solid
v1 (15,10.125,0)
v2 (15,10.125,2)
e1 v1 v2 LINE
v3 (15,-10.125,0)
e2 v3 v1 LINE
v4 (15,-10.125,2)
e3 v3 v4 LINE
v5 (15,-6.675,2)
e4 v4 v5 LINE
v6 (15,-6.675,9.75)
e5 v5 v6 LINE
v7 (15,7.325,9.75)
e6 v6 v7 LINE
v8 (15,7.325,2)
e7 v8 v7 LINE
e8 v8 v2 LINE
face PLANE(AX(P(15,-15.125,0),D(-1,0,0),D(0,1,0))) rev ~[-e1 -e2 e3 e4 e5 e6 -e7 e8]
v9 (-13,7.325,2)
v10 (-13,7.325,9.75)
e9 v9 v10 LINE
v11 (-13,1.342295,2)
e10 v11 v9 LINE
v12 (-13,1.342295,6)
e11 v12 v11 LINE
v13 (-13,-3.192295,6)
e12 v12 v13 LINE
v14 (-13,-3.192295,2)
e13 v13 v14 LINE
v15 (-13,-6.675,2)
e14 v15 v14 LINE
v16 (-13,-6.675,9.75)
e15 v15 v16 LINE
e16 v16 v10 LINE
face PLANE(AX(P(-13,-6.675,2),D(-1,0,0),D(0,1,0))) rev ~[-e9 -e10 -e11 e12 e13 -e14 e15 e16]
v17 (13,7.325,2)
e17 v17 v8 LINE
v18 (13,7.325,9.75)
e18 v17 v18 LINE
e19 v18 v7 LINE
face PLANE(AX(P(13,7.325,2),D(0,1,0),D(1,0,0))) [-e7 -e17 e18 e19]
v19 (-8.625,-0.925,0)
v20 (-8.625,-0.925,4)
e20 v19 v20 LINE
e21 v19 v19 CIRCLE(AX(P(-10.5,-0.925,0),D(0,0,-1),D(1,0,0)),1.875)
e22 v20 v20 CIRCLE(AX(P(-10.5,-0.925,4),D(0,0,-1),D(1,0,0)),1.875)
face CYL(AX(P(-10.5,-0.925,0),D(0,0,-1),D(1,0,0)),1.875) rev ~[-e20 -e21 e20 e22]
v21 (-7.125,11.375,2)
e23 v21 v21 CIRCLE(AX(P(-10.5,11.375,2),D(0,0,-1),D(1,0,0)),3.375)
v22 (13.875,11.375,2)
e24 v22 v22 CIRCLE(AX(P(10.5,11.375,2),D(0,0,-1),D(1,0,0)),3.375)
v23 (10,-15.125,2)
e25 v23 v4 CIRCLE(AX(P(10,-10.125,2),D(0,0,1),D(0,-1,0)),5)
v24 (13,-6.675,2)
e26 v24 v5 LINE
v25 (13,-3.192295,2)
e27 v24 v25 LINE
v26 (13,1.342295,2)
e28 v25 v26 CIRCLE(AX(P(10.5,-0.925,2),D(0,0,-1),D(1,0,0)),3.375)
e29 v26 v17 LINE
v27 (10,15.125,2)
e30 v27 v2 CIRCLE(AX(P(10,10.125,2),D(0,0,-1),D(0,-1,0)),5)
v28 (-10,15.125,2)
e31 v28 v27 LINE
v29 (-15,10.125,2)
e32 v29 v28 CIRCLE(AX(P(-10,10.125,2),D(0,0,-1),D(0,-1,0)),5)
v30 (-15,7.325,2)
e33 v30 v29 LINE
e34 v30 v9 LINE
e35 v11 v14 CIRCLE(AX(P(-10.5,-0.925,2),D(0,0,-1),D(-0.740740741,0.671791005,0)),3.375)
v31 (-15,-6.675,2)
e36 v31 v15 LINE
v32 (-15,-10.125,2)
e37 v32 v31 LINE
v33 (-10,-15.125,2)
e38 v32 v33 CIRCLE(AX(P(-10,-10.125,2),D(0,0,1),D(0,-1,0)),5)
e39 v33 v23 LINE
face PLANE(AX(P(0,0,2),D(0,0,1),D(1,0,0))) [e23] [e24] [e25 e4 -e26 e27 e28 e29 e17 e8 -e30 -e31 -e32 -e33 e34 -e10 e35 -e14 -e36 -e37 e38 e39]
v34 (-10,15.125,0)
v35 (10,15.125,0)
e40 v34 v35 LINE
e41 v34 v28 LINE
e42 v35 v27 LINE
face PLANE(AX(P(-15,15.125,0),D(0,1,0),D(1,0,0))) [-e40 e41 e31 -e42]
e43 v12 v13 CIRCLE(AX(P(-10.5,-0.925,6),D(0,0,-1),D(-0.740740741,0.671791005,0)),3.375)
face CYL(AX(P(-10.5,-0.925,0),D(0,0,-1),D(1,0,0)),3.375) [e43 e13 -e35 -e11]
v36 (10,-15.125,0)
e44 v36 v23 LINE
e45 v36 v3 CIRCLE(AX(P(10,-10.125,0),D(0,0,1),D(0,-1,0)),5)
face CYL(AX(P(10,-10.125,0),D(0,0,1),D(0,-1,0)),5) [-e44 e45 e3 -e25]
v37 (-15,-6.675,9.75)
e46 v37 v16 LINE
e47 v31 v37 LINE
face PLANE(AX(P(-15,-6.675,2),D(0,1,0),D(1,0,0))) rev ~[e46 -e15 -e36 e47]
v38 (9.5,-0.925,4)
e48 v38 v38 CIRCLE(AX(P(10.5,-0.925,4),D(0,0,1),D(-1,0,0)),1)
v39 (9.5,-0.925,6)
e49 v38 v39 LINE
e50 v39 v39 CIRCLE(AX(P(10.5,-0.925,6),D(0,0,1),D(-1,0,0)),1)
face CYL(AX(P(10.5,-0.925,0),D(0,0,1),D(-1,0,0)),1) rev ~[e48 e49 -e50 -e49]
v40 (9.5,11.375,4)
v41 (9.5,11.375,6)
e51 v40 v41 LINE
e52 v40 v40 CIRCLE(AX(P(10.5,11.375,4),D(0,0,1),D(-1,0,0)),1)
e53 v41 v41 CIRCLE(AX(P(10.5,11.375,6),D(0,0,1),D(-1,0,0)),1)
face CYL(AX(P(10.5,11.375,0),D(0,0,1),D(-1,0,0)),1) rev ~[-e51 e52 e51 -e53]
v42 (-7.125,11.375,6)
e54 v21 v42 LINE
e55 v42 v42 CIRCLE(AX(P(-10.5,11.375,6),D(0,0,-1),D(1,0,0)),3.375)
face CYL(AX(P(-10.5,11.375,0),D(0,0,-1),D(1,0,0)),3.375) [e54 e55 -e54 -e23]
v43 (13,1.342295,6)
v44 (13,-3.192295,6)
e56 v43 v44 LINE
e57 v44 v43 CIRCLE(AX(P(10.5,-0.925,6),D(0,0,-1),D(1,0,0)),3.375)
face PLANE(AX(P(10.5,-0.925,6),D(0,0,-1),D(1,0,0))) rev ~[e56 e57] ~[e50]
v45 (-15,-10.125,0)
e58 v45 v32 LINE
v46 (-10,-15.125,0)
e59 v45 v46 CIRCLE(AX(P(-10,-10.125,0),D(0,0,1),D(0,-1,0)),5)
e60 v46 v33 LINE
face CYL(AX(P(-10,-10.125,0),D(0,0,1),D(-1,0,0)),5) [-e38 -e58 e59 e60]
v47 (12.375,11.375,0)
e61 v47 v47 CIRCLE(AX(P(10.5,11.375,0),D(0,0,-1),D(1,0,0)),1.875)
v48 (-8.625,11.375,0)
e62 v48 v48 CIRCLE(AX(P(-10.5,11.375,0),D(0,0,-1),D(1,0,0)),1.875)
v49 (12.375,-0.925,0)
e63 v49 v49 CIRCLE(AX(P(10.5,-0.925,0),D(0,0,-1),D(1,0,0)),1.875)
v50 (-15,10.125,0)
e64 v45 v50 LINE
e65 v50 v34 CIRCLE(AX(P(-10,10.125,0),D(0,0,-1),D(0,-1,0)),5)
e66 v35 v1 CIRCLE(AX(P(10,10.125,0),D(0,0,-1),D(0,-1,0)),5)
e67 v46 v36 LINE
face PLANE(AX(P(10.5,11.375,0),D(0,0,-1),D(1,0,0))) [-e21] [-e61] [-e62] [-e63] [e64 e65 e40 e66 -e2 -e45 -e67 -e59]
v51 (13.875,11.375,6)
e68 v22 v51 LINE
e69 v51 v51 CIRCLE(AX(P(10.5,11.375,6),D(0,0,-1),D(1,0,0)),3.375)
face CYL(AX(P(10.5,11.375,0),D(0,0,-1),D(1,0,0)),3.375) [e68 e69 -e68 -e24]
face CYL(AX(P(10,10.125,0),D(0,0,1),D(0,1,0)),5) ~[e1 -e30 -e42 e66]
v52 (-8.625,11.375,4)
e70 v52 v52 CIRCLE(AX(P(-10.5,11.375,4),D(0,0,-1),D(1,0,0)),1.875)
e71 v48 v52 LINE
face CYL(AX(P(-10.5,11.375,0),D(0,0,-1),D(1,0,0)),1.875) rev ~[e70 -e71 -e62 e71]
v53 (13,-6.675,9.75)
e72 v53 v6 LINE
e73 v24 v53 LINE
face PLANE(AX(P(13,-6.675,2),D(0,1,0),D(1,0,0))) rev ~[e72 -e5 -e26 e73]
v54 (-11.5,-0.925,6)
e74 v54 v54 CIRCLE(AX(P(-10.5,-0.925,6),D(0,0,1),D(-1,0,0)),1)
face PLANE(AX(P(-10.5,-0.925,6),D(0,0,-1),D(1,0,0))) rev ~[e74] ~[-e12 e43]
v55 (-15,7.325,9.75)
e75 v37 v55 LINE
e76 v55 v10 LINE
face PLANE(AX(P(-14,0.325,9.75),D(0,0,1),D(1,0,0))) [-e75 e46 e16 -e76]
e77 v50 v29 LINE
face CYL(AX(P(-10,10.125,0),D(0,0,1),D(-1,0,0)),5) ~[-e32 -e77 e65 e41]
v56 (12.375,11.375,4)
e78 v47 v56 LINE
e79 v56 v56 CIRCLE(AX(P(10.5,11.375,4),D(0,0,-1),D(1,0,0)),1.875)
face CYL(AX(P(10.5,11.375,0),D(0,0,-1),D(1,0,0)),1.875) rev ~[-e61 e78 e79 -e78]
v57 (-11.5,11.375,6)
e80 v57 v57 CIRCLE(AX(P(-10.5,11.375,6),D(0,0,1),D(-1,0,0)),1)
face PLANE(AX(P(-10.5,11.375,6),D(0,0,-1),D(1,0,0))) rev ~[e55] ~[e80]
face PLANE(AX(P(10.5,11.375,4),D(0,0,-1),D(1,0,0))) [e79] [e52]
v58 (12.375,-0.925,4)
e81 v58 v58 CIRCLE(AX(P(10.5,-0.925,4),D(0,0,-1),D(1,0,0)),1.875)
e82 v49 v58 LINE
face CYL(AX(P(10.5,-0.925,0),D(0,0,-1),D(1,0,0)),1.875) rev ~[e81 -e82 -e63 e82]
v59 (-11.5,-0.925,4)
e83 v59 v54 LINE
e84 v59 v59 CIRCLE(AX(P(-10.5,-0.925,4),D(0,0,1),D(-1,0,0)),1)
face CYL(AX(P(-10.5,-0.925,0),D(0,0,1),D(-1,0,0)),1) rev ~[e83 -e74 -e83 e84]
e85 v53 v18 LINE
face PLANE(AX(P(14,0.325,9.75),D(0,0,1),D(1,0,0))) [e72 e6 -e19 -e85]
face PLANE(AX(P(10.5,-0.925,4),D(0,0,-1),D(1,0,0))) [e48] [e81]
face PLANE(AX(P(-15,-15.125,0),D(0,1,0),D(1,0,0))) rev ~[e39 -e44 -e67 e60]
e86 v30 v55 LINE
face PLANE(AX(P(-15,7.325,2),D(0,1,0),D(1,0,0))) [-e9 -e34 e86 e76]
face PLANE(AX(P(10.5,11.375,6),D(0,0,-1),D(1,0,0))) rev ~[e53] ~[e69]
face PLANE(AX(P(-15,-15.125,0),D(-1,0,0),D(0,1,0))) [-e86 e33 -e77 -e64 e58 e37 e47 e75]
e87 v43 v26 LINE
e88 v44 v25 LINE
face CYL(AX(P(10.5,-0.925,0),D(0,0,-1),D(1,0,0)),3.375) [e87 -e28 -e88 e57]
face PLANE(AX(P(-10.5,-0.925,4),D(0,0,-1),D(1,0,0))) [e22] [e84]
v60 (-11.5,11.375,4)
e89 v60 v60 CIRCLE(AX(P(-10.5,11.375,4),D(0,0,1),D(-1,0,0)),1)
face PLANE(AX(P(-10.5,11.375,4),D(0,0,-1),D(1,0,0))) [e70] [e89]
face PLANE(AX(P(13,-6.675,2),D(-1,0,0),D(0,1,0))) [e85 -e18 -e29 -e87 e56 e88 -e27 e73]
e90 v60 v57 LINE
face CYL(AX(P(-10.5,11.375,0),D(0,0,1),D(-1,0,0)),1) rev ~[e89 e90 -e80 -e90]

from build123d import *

# Parameters (mm, degrees)
F0_W     = 30
F0_H     = 30.25
F1_DEPTH = 2
F2_W     = 2
F2_H     = 14
F3_DEPTH = 7.75
F5_R     = 3.375
F6_DEPTH = 6
F4_R     = 1.875
F7_DEPTH = 4
F9_D     = 2
F9_DEPTH = 4
F9_START = 4
F9_TIP   = 0.600860619
F10_R    = 5


with BuildPart() as f1:
    # F0 (on Top) → F1 (new body)
    with BuildSketch(Plane.XY):
        Rectangle(F0_W, F0_H)
    extrude(amount=F1_DEPTH)

    # F2 (on face) → F3 (join)
    with BuildSketch(Plane.XY.offset(2)):
        with Locations((-14, 0.325)):
            Rectangle(F2_W, F2_H)
        with Locations((14, 0.325)):
            Rectangle(F2_W, F2_H)
    extrude(amount=F3_DEPTH)

    # F5 (on face) → F6 (join)
    with BuildSketch(Plane(origin=(0, 0, 0), x_dir=(1, 0, 0), z_dir=(0, 0, -1))):
        with Locations((10.5, -11.375)):
            Circle(F5_R)
        with Locations((-10.5, -11.375)):
            Circle(F5_R)
        with Locations((-10.5, 0.925)):
            Circle(F5_R)
        with Locations((10.5, 0.925)):
            Circle(F5_R)
    extrude(amount=-F6_DEPTH)

    # F4 (on face) → F7 (cut)
    with BuildSketch(Plane(origin=(0, 0, 0), x_dir=(1, 0, 0), z_dir=(0, 0, -1))):
        with Locations((-10.5, -11.375)):
            Circle(F4_R)
        with Locations((-10.5, 0.925)):
            Circle(F4_R)
        with Locations((10.5, -11.375)):
            Circle(F4_R)
        with Locations((10.5, 0.925)):
            Circle(F4_R)
    extrude(amount=-F7_DEPTH, mode=Mode.SUBTRACT)

    # F9
    # its depths count from where the whole tool has entered the part; down to there all is cleared
    with Locations(Plane(origin=(0, 0, 0), x_dir=(1, 0, 0), z_dir=(0, 0, -1)).offset(-F9_START)):
        with Locations((-10.5, 0.925), (-10.5, -11.375), (10.5, -11.375), (10.5, 0.925)):
            Hole(F9_D / 2, depth=F9_DEPTH)
            with Locations((0, 0, -(F9_DEPTH + F9_TIP / 2))):  # 118° drill point
                Cone(0, F9_D / 2, F9_TIP, mode=Mode.SUBTRACT)

    # F10
    f10_edges = [f1.edges().sort_by_distance(p)[0] for p in [
        (-15, -15.125, 1),
        (15, -15.125, 1),
        (15, 15.125, 1),
        (-15, 15.125, 1),
    ]]
    fillet(f10_edges, radius=F10_R)


solid = f1.part
